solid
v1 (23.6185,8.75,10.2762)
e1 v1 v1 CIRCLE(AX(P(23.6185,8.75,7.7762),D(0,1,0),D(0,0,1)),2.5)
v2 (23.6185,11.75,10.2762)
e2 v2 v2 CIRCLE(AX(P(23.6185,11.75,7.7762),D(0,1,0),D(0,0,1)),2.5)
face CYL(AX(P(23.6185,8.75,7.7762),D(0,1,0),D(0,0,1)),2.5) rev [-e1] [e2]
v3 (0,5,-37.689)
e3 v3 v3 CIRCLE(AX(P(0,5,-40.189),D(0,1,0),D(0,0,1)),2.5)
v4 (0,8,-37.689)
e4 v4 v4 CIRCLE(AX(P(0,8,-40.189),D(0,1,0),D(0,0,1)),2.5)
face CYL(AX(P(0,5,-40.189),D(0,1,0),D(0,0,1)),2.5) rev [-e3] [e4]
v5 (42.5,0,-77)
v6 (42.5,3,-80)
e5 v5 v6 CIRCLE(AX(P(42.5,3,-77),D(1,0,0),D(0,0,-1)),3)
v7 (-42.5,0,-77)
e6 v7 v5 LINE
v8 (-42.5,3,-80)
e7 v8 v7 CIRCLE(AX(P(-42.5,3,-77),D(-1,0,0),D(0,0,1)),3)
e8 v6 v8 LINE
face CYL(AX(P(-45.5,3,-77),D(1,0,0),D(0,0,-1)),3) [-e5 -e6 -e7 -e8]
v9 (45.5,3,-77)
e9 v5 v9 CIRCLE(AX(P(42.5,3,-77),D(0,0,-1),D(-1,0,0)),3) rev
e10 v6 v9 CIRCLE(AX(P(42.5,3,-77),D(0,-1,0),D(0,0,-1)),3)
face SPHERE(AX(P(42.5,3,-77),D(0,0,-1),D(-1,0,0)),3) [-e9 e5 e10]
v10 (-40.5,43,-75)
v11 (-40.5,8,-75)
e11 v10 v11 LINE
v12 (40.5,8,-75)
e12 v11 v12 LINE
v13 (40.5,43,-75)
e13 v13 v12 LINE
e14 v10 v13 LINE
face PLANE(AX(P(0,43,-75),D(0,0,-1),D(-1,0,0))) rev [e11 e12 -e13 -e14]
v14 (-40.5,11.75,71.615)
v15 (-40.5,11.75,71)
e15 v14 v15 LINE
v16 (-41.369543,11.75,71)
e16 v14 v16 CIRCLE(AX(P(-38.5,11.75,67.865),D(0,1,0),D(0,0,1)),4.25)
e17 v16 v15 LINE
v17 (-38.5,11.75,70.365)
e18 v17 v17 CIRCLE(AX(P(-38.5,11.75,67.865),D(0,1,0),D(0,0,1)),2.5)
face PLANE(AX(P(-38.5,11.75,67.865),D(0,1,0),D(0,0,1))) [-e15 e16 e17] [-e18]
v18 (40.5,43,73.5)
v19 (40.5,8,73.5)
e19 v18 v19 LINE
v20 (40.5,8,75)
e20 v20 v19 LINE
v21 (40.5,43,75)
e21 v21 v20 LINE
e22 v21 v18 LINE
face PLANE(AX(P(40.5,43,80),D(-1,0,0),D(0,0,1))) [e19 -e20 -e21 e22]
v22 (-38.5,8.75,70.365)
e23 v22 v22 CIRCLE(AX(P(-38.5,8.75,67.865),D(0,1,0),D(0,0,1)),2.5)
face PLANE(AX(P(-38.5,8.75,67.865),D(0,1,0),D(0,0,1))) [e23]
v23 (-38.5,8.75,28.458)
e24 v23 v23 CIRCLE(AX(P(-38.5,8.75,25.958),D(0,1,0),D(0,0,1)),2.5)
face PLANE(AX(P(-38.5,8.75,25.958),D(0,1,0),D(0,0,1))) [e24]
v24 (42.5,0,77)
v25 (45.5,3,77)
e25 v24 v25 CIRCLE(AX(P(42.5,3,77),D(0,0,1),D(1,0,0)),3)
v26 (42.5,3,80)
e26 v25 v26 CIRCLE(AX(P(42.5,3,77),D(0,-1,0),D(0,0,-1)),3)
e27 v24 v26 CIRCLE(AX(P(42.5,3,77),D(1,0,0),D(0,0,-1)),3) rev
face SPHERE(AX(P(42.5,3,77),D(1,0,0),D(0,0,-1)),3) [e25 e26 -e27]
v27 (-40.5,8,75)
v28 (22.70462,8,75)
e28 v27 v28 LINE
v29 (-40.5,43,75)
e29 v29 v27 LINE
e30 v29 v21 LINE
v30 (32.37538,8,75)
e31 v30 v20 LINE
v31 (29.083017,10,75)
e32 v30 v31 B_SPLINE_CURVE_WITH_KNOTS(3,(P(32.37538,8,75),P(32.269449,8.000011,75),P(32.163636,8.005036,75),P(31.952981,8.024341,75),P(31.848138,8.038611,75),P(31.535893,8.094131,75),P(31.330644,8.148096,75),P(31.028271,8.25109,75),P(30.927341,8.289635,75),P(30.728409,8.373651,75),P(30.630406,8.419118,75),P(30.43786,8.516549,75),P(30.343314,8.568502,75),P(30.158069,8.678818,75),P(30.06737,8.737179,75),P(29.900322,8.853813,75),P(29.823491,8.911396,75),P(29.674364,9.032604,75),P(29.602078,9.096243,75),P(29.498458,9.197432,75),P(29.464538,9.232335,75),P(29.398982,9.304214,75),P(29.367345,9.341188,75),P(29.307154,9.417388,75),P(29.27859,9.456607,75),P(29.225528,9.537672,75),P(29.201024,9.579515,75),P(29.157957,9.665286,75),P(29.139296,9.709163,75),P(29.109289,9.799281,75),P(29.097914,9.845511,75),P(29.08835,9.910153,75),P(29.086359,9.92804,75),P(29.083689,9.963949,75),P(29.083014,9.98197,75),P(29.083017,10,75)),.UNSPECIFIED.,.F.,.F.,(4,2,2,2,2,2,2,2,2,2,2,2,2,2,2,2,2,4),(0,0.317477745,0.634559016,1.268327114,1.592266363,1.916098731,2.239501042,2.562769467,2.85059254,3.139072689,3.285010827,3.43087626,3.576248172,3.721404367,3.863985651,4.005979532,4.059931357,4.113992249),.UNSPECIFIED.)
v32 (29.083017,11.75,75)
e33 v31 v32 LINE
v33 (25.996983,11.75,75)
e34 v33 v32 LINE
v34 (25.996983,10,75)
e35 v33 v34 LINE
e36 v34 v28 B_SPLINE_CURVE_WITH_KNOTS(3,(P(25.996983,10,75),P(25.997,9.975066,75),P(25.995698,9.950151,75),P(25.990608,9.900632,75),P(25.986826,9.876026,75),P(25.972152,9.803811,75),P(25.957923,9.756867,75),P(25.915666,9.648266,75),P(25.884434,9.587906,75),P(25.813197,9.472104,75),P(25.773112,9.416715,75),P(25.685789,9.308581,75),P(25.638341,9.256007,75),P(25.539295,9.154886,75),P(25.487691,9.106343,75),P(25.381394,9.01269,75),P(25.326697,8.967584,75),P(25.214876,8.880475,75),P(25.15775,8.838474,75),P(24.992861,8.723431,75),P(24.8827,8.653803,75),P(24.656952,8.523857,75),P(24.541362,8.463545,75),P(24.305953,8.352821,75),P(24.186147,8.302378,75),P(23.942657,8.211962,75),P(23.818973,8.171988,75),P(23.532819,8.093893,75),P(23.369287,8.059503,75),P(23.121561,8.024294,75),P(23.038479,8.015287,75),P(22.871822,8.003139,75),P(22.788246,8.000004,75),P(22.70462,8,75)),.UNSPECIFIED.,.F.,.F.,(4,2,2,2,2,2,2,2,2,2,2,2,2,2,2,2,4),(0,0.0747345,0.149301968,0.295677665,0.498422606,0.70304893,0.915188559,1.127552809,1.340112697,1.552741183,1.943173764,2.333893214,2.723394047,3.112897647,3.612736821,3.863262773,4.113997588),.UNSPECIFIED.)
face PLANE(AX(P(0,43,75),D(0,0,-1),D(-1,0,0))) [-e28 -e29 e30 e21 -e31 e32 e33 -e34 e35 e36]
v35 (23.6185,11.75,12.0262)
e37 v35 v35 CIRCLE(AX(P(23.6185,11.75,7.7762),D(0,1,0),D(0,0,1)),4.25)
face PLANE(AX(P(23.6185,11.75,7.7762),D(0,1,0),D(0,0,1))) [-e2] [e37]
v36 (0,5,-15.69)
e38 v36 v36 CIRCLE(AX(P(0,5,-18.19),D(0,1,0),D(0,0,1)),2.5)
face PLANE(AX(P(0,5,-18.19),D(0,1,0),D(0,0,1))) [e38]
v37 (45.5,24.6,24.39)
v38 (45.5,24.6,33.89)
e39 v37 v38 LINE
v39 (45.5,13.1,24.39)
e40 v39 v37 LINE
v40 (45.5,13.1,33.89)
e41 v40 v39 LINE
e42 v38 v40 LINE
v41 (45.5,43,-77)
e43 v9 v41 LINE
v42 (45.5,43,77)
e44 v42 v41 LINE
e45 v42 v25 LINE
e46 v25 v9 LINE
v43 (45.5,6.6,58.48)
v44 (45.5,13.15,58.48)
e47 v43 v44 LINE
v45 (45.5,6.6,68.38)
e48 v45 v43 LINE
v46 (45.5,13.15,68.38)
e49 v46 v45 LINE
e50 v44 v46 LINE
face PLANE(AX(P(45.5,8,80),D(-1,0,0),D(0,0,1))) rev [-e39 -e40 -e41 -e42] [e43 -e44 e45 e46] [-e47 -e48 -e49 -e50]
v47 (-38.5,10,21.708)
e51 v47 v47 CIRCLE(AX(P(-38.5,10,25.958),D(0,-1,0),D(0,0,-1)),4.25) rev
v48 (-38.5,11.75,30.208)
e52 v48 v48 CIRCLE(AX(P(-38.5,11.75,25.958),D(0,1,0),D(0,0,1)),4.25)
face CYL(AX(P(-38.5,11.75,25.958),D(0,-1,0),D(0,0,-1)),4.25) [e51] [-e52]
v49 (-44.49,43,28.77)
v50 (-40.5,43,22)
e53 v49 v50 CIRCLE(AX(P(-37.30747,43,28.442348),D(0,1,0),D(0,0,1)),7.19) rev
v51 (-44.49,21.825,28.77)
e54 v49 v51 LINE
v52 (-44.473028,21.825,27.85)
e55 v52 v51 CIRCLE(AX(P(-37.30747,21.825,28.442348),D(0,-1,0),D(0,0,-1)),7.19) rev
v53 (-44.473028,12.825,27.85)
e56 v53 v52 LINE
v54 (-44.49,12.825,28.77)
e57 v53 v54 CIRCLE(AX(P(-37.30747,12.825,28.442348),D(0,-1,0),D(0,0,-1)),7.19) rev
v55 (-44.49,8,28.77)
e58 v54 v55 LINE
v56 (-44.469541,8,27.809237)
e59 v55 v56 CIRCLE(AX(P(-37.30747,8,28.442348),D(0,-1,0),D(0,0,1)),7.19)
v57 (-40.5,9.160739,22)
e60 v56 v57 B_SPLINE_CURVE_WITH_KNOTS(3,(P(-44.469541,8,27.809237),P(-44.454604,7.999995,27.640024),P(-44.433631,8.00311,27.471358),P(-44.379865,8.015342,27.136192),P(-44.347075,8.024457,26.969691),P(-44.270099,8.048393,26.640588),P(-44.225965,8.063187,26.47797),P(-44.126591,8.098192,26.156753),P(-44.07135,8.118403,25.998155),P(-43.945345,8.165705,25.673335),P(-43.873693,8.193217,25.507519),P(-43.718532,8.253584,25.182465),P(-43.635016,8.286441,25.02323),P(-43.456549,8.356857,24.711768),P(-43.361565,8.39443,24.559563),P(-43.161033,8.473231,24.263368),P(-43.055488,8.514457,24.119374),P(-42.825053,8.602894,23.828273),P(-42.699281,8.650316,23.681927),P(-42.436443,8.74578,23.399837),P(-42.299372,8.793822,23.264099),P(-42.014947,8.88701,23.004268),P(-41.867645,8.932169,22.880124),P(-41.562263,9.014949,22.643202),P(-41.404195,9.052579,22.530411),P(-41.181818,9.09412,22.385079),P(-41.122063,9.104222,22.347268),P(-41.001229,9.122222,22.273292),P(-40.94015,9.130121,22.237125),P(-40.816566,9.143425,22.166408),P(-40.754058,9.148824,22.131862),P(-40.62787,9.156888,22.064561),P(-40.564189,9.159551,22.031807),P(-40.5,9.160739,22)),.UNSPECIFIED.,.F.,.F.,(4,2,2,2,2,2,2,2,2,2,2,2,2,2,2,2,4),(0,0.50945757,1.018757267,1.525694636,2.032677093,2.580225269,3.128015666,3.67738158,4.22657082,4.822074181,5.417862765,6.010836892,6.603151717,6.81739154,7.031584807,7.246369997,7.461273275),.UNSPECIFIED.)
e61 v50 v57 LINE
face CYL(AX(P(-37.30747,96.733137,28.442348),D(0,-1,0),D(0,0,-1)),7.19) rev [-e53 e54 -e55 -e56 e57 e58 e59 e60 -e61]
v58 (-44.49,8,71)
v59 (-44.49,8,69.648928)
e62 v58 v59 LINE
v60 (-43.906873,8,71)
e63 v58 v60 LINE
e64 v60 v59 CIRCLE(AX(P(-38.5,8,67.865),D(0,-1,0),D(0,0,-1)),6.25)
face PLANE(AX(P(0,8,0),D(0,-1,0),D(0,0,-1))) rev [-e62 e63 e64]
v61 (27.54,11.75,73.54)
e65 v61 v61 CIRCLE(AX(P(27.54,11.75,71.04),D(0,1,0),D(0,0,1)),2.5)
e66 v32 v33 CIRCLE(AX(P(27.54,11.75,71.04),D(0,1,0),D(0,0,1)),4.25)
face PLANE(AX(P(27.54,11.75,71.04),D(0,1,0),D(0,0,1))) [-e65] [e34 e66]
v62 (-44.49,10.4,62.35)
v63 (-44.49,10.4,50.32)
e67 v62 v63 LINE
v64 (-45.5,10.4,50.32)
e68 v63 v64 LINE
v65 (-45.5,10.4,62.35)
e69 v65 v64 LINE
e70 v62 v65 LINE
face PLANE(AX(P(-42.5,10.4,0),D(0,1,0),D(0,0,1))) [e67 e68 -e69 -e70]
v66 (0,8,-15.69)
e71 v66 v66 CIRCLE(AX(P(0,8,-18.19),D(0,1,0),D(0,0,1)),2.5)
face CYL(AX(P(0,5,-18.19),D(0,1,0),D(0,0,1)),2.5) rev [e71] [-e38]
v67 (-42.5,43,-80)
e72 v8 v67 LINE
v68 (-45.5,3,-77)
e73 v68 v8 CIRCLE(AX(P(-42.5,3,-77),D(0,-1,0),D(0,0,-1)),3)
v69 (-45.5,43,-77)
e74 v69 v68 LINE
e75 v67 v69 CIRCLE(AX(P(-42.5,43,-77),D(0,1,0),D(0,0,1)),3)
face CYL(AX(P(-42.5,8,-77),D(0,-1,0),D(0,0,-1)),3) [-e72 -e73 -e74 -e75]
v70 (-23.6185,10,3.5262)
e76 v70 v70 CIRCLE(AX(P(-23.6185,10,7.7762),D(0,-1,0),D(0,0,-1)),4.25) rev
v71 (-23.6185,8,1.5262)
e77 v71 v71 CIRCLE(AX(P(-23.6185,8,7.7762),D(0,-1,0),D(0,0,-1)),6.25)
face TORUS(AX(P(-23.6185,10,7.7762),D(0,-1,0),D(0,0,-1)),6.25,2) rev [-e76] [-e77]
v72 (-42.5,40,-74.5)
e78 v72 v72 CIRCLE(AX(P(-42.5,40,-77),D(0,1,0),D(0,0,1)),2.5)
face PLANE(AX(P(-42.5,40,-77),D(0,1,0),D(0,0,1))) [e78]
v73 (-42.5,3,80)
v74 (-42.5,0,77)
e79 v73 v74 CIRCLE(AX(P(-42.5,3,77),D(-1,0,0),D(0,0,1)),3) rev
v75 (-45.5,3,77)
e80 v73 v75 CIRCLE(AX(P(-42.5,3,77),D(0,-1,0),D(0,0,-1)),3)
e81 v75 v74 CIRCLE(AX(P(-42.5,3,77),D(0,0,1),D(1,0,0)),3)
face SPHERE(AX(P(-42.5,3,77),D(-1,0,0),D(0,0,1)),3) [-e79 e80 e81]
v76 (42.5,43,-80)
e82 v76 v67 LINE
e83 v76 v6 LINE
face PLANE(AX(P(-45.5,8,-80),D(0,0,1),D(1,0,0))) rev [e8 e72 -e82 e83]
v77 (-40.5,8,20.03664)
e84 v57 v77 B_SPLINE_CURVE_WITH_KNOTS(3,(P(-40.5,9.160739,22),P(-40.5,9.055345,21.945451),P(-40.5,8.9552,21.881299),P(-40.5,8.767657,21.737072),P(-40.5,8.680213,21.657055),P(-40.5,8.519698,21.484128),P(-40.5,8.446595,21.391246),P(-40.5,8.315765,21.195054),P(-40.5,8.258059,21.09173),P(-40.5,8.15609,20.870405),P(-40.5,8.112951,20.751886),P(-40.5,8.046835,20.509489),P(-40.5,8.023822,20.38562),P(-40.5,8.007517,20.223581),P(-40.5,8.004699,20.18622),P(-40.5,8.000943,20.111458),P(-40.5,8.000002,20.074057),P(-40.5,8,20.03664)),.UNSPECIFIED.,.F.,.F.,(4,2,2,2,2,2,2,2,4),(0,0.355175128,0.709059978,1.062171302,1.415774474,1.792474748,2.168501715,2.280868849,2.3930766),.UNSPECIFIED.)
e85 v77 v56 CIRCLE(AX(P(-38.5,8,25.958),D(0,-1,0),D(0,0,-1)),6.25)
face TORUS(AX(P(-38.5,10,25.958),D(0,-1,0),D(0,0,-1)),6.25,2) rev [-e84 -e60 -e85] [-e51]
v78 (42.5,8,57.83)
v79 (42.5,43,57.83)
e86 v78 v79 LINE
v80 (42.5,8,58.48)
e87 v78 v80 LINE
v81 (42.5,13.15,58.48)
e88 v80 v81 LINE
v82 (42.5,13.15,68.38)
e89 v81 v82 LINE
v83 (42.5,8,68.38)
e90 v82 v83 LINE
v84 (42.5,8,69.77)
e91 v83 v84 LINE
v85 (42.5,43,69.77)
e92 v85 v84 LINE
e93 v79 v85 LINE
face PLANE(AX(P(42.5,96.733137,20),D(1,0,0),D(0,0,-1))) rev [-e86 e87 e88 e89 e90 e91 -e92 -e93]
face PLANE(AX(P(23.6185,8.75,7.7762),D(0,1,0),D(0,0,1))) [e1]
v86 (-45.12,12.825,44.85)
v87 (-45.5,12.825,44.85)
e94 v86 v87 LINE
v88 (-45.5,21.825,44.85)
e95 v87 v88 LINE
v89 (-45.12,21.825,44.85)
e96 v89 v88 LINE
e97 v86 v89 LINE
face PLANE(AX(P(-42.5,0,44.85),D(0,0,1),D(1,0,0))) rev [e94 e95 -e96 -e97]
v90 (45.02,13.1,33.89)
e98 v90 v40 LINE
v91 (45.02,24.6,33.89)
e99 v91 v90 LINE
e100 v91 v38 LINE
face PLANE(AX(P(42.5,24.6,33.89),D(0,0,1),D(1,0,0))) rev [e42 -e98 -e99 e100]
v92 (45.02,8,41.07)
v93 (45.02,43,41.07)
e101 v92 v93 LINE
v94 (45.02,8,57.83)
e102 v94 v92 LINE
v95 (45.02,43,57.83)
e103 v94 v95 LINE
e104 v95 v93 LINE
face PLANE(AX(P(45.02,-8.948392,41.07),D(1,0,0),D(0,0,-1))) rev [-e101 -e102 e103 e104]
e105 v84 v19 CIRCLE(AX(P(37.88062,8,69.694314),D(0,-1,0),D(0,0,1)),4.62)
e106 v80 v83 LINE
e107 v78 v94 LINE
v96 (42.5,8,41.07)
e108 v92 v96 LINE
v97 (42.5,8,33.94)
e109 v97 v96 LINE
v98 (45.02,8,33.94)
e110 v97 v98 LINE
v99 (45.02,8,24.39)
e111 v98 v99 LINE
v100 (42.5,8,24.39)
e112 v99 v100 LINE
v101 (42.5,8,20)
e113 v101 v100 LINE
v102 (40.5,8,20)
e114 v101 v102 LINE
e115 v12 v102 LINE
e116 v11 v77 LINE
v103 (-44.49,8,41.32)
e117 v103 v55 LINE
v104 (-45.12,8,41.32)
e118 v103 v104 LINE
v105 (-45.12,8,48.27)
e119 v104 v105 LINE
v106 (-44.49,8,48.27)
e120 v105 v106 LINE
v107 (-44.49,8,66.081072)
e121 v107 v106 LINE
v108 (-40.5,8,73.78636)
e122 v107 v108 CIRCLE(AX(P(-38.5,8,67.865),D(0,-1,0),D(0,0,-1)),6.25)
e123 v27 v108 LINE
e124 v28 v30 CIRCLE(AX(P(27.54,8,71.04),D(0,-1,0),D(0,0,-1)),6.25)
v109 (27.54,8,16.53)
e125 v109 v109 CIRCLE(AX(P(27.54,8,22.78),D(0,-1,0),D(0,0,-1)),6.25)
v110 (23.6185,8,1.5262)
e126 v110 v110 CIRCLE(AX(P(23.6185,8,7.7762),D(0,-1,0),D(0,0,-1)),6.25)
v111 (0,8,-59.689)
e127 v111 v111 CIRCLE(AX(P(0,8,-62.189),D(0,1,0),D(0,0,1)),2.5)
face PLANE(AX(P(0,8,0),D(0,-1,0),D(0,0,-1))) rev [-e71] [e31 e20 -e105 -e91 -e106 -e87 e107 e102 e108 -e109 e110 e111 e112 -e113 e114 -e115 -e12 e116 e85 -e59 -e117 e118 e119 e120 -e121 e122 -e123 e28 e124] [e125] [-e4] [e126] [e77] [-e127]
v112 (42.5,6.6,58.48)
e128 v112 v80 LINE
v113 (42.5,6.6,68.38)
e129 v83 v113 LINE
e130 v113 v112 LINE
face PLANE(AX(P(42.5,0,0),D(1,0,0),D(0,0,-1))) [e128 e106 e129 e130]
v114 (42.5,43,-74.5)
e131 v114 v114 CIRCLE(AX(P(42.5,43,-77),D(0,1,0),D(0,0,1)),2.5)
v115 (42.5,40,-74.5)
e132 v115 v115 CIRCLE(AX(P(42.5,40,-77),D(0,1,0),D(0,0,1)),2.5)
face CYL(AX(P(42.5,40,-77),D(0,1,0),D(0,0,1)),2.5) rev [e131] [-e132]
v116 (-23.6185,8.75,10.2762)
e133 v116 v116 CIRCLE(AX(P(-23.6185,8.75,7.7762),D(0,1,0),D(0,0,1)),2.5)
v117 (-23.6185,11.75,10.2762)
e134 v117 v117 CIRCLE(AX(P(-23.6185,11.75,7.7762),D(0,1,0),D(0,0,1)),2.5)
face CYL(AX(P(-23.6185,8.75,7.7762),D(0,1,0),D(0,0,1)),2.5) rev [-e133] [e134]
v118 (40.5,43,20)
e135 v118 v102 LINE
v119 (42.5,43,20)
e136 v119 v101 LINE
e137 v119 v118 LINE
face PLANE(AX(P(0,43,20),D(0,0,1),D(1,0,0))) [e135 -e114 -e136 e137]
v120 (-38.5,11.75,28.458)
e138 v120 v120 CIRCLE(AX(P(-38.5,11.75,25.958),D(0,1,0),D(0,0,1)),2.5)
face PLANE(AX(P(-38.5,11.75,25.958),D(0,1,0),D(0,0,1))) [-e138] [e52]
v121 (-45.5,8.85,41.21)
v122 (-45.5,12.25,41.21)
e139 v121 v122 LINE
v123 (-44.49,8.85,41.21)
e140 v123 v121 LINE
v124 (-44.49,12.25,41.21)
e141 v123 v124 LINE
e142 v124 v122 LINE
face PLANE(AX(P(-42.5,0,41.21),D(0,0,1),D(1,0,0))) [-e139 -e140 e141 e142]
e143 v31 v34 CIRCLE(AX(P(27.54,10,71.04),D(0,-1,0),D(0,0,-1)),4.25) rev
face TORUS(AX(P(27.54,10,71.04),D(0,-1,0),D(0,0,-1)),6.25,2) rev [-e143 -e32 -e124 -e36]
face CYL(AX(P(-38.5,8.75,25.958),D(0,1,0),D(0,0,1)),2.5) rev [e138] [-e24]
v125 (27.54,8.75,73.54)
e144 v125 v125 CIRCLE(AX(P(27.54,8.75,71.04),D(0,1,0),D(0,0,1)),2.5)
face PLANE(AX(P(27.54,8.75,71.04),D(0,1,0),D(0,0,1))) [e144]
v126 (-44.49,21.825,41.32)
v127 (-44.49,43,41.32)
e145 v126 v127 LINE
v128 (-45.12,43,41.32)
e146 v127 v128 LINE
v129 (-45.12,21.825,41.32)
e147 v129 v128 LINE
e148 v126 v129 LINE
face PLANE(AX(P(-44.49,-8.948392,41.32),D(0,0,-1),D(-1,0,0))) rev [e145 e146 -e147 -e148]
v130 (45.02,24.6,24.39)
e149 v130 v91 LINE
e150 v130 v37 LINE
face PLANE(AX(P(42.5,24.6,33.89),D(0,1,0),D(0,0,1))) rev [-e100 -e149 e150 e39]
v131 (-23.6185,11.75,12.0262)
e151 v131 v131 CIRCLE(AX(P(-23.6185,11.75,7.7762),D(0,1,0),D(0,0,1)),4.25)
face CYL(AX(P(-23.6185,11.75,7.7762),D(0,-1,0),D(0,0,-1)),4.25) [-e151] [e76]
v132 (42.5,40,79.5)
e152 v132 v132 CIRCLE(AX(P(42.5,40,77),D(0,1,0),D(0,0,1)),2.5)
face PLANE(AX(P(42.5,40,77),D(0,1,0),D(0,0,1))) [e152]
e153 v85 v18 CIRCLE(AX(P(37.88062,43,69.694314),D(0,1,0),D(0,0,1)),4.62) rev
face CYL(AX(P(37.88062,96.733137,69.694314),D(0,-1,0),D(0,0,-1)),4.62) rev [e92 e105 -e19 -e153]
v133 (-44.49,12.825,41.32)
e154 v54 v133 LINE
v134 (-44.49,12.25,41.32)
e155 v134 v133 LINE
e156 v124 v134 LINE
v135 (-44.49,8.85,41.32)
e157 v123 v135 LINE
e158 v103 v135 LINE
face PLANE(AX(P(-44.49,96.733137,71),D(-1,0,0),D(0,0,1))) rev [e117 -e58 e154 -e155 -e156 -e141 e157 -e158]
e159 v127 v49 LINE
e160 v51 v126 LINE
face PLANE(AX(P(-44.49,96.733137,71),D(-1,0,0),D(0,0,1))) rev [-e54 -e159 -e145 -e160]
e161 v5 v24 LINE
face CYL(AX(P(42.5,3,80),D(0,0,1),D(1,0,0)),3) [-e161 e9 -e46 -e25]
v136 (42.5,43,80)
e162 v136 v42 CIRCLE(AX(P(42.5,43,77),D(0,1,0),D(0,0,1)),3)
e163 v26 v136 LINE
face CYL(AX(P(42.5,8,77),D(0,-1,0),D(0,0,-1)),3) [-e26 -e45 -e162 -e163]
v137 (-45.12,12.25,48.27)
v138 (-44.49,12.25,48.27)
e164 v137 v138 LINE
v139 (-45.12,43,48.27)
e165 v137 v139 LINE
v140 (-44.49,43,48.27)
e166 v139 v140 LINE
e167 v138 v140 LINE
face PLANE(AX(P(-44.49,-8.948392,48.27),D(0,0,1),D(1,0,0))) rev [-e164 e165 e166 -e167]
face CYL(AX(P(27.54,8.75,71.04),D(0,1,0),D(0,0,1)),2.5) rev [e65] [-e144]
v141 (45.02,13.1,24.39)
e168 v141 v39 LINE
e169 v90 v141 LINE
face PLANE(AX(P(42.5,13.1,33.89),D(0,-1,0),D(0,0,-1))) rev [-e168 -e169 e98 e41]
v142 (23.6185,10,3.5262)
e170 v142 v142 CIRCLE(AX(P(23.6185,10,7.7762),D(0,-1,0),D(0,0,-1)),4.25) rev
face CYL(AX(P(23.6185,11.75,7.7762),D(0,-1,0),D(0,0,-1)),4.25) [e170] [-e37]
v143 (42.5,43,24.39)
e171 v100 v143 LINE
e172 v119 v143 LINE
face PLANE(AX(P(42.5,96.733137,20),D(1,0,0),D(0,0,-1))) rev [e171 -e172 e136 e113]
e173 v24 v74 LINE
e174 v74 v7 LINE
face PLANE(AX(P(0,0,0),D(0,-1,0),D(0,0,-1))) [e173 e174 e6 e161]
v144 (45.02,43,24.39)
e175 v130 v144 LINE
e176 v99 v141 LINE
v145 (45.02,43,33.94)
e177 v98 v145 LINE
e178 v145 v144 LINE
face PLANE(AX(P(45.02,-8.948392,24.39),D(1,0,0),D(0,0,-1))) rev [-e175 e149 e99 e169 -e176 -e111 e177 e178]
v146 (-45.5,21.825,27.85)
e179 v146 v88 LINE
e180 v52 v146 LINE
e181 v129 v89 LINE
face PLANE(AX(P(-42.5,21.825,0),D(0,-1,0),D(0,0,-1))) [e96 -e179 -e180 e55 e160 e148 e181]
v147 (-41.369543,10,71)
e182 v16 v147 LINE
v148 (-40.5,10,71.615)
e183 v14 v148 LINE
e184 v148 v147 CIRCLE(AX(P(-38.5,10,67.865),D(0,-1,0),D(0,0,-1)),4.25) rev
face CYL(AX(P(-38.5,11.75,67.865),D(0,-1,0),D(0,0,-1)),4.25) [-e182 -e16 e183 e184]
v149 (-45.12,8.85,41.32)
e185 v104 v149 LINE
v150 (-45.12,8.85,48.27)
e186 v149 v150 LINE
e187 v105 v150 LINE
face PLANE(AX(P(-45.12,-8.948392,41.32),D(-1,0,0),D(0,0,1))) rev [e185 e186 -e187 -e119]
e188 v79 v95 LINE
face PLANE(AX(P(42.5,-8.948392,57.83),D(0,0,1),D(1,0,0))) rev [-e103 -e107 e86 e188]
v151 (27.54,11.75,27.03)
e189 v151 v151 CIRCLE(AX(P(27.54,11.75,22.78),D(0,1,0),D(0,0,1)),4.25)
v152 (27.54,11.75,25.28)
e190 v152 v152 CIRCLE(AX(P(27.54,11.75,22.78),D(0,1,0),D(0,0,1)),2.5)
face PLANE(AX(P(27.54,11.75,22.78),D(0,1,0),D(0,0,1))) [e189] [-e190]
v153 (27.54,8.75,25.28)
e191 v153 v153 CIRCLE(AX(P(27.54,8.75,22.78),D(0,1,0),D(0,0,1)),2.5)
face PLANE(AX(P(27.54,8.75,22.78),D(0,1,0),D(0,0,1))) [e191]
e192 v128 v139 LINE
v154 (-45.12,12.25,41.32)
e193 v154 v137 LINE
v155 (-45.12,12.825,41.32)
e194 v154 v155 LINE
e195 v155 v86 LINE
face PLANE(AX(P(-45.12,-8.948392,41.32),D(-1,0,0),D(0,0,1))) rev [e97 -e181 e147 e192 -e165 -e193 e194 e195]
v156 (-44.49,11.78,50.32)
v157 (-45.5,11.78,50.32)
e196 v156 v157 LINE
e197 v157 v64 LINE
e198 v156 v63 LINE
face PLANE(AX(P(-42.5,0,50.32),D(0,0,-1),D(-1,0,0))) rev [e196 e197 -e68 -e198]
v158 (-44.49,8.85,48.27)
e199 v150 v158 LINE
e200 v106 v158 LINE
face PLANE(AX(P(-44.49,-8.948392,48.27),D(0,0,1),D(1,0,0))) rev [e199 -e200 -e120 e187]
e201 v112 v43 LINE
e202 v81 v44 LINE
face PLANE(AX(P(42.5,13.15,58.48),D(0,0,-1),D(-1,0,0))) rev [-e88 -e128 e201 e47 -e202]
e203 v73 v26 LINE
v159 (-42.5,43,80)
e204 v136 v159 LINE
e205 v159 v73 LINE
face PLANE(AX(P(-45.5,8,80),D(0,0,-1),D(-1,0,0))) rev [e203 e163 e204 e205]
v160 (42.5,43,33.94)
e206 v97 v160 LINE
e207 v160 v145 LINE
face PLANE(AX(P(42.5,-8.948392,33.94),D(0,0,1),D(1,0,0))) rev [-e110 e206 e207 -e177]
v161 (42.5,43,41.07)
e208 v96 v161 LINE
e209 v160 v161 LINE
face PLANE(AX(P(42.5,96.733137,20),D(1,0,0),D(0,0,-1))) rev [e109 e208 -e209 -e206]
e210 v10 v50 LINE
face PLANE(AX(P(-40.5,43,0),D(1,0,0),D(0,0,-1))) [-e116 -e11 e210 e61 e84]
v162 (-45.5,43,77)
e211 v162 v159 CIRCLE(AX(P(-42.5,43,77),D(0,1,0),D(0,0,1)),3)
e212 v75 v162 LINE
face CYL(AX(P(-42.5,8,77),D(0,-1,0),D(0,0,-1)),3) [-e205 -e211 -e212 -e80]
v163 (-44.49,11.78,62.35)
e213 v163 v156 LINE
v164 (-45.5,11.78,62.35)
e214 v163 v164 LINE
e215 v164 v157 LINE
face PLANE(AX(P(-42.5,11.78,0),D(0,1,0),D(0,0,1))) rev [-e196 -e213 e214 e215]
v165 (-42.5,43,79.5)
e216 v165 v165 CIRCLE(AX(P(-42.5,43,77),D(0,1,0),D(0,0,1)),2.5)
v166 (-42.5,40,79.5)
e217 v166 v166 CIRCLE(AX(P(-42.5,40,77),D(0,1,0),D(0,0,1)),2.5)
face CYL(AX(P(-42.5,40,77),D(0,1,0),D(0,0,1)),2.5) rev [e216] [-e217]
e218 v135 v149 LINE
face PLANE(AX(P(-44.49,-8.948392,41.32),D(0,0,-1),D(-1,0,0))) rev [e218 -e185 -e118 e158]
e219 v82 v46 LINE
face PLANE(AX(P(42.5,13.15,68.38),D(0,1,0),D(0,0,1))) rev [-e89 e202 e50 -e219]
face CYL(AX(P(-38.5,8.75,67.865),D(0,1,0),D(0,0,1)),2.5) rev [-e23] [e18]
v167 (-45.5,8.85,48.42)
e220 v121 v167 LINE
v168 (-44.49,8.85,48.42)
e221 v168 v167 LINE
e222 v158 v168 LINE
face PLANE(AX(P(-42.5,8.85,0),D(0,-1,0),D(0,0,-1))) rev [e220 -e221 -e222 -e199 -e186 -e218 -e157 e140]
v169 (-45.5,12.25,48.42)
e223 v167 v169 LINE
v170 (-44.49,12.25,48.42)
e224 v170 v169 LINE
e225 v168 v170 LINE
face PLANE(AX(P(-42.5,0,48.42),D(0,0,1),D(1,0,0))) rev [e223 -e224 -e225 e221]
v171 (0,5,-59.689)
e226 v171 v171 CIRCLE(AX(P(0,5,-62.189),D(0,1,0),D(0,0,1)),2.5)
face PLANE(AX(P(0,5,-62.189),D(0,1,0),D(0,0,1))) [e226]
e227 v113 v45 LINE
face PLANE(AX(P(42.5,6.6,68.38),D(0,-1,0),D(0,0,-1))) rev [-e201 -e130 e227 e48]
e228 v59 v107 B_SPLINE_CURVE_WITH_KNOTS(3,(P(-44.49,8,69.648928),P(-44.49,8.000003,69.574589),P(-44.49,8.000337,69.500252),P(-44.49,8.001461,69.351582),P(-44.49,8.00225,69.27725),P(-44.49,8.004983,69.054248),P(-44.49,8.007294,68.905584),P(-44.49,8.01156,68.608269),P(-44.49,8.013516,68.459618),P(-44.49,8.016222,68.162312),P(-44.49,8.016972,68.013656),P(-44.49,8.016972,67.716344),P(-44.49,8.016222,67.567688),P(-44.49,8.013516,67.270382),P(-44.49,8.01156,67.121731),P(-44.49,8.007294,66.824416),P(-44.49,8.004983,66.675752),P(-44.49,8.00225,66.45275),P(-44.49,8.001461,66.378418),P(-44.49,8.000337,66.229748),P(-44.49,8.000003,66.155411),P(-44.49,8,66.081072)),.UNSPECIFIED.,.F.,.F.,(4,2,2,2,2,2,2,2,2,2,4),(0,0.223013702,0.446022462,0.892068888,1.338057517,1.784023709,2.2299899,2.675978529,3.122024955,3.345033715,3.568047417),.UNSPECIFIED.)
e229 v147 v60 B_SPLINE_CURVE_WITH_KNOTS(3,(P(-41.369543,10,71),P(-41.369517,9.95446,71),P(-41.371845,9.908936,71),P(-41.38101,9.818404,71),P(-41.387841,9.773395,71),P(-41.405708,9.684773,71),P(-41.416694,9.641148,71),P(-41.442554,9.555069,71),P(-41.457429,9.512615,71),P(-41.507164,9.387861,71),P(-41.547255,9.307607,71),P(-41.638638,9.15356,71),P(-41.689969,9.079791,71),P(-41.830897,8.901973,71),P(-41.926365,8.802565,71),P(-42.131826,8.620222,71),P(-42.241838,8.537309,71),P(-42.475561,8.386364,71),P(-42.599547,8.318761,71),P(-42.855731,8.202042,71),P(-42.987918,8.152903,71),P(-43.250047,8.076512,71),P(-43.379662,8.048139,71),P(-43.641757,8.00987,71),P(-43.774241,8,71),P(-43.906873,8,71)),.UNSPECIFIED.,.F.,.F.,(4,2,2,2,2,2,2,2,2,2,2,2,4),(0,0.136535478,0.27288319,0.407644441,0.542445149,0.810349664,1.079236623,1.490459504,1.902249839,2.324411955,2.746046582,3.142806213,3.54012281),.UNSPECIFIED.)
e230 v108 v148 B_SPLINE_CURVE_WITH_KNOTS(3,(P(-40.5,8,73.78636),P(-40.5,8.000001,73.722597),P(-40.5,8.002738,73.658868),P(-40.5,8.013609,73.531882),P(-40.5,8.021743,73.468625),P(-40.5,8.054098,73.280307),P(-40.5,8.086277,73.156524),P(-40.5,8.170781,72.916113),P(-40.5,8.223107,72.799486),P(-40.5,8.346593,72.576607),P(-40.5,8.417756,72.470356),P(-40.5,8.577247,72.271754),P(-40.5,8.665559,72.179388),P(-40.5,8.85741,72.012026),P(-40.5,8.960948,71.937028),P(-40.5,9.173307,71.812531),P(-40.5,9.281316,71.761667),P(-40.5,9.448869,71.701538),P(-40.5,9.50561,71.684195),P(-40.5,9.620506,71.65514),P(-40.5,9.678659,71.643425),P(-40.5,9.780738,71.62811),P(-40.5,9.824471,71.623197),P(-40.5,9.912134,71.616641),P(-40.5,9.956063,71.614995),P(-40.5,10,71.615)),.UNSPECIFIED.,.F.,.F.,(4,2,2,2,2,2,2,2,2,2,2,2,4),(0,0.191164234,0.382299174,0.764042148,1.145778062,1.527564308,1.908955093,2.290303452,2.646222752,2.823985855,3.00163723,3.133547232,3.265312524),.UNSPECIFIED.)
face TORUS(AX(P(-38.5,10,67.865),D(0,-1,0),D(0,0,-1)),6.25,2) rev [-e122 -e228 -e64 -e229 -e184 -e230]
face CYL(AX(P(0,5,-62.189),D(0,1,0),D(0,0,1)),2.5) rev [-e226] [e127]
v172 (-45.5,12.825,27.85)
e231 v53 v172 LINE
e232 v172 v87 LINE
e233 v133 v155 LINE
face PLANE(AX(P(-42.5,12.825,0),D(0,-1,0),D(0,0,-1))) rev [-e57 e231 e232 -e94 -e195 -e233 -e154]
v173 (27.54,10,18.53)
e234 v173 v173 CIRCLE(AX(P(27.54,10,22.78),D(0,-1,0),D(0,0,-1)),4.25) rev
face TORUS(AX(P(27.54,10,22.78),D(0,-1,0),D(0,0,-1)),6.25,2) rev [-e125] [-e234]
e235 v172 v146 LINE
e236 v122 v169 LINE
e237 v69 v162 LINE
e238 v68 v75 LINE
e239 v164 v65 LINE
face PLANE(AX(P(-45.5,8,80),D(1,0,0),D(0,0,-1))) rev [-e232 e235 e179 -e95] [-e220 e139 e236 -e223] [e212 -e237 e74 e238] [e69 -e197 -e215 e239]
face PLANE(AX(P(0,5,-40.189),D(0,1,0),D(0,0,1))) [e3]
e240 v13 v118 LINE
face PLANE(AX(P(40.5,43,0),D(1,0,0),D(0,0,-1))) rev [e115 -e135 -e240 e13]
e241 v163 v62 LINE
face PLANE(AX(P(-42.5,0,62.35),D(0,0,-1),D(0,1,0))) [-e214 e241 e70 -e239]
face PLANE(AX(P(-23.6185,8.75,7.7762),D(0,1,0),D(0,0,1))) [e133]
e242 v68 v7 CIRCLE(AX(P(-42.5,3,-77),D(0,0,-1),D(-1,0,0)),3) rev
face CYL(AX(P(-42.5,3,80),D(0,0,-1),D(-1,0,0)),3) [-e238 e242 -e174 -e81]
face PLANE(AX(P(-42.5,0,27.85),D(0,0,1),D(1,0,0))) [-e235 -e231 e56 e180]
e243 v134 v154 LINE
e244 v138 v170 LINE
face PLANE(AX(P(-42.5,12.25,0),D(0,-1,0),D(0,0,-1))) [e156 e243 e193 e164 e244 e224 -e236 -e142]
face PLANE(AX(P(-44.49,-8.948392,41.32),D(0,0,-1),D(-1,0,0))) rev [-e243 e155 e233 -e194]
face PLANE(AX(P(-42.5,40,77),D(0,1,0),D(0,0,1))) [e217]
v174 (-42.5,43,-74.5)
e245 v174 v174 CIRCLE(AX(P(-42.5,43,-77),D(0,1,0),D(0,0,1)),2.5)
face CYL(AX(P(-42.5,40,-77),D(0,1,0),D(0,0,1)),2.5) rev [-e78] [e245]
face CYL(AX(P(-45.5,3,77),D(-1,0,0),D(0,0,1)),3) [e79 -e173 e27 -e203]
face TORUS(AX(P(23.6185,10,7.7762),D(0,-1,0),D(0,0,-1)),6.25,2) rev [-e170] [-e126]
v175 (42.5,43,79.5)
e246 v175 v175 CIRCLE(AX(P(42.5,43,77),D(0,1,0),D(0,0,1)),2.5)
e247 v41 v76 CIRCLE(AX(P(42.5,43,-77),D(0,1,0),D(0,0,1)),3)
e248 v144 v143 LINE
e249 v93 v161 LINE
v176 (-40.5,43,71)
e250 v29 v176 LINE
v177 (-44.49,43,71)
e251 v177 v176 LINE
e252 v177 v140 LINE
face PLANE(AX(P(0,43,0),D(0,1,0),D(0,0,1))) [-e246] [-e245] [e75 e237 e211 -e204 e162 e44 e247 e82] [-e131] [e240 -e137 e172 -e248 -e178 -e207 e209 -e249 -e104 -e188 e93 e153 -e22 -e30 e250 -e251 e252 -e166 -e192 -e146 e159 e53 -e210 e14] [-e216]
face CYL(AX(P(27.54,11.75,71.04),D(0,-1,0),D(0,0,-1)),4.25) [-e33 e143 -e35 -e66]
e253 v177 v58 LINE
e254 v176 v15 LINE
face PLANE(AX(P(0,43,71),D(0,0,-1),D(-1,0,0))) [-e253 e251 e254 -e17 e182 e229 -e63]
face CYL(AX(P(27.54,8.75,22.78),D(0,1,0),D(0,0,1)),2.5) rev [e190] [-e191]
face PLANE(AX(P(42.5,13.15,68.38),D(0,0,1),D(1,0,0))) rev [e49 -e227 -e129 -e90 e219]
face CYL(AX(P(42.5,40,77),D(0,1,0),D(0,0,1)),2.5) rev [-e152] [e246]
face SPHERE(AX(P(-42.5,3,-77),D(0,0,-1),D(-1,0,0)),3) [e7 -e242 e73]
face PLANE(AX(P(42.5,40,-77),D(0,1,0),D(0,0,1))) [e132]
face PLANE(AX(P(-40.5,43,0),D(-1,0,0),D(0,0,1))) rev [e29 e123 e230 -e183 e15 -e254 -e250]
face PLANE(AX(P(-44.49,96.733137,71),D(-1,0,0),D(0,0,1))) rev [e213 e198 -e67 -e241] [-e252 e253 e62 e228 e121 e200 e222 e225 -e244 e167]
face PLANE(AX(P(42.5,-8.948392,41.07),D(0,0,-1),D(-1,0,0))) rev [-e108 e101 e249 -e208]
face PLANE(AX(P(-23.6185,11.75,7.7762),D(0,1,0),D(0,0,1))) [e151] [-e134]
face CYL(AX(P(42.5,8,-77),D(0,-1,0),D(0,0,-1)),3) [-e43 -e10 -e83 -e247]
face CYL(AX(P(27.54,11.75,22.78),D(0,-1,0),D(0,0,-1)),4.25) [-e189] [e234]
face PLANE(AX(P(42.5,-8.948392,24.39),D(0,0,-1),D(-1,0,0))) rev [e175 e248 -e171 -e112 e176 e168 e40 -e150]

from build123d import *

# Parameters (mm, degrees)
SKETCH1_W           = 91
SKETCH1_H           = 160
BOSS_EXTRUDE1_DEPTH = 8
BOSS_EXTRUDE4_DEPTH = 35
SKETCH5_R           = 4.25
BOSS_EXTRUDE5_DEPTH = 3.75
BOSS_EXTRUDE6_DEPTH = 35
SKETCH7_W           = 2.52
SKETCH7_H           = 9.55
SKETCH7_H_2         = 16.76
SKETCH7_W_2         = 0.63
SKETCH7_H_3         = 6.95
CUT_EXTRUDE1_DEPTH  = 35
SKETCH8_R           = 2.5
CUT_EXTRUDE2_DEPTH  = 3
SKETCH9_R           = 2.5
CUT_EXTRUDE3_DEPTH  = 3
FILLET2_R           = 2
SKETCH10_W          = 9.9
SKETCH10_H          = 6.55
SKETCH10_W_2        = 9.5
SKETCH10_H_2        = 11.5
CUT_EXTRUDE4_DEPTH  = 3
SKETCH11_W          = 12.03
SKETCH11_H          = 1.38
SKETCH11_W_2        = 7.21
SKETCH11_H_2        = 3.4
SKETCH11_W_3        = 17
SKETCH11_H_3        = 9
CUT_EXTRUDE5_DEPTH  = 3
SKETCH12_R          = 2.5
CUT_EXTRUDE6_DEPTH  = 3
FILLET3_R           = 3


with BuildPart() as part:
    # Sketch1 → Boss-Extrude1 (new body)
    with BuildSketch(Plane(origin=(0, 0, 0), x_dir=(1, 0, 0), z_dir=(0, 1, 0))):
        Rectangle(SKETCH1_W, SKETCH1_H)
    extrude(amount=BOSS_EXTRUDE1_DEPTH)

    # Sketch4 → Boss-Extrude4 (add)
    with BuildSketch(Plane(origin=(0, 8, 0), x_dir=(1, 0, 0), z_dir=(0, 1, 0))):
        Polygon((-45.5, 80), (-45.5, -22), (-40.5, -22), (-40.5, 75), (40.5, 75), (40.5, -20), (45.5, -20), (45.5, 80), align=None)
        Polygon((-45.5, -80), (45.5, -80), (45.5, -73.5), (40.5, -73.5), (40.5, -75), (-40.5, -75), (-40.5, -71), (-45.5, -71), align=None)
    extrude(amount=BOSS_EXTRUDE4_DEPTH)

    # Sketch5 → Boss-Extrude5 (add)
    with BuildSketch(Plane(origin=(0, 8, 0), x_dir=(1, 0, 0), z_dir=(0, 1, 0))):
        with Locations(Location((23.6185, -7.7762, 0), (0, 0, 90))):
            Circle(SKETCH5_R)
        with Locations(Location((-23.6185, -7.7762, 0), (0, 0, 90))):
            Circle(SKETCH5_R)
        with Locations(Location((27.54, -22.78, 0), (0, 0, 90))):
            Circle(SKETCH5_R)
        with Locations((27.54, -71.04)):
            Circle(SKETCH5_R)
        with Locations((-38.5, -67.865)):
            Circle(SKETCH5_R)
        with Locations(Location((-38.5, -25.958, 0), (0, 0, 90))):
            Circle(SKETCH5_R)
    extrude(amount=BOSS_EXTRUDE5_DEPTH)

    # Sketch6 → Boss-Extrude6 (add)
    with BuildSketch(Plane(origin=(0, 8, 0), x_dir=(1, 0, 0), z_dir=(0, 1, 0))):
        with BuildLine():
            Line((-45.5, -22), (-45.5, -71))
            Line((-45.5, -71), (-44.49, -71))
            Line((-44.49, -71), (-44.49, -28.77))
            ThreePointArc((-44.49, -28.77), (-43.501716646, -24.7916766), (-40.5, -22))
            Line((-40.5, -22), (-45.5, -22))
        make_face()
        with BuildLine():
            Line((45.5, -73.5), (45.5, -20))
            Line((45.5, -20), (42.5, -20))
            Line((42.5, -20), (42.5, -69.77))
            ThreePointArc((42.5, -69.77), (41.952245791, -71.877491041), (40.5, -73.5))
            Line((40.5, -73.5), (45.5, -73.5))
        make_face()
    extrude(amount=BOSS_EXTRUDE6_DEPTH)

    # Sketch7 → Cut-Extrude1 (cut)
    with BuildSketch(Plane(origin=(0, 43, 0), x_dir=(1, 0, 0), z_dir=(0, 1, 0))):
        with Locations((43.76, -29.165)):
            Rectangle(SKETCH7_W, SKETCH7_H)
        with Locations((43.76, -49.45)):
            Rectangle(SKETCH7_W, SKETCH7_H_2)
        with Locations((-44.805, -44.795)):
            Rectangle(SKETCH7_W_2, SKETCH7_H_3)
    extrude(amount=-CUT_EXTRUDE1_DEPTH, mode=Mode.SUBTRACT)

    # Sketch8 → Cut-Extrude2 (cut)
    with BuildSketch(Plane(origin=(0, 8, 0), x_dir=(1, 0, 0), z_dir=(0, 1, 0))):
        with Locations(Location((0, 62.189, 0), (0, 0, 270))):
            Circle(SKETCH8_R)
        with Locations(Location((0, 40.189, 0), (0, 0, 270))):
            Circle(SKETCH8_R)
        with Locations(Location((0, 18.19, 0), (0, 0, 270))):
            Circle(SKETCH8_R)
    extrude(amount=-CUT_EXTRUDE2_DEPTH, mode=Mode.SUBTRACT)

    # Sketch9 → Cut-Extrude3 (cut)
    with BuildSketch(Plane(origin=(0, 11.75, 0), x_dir=(1, 0, 0), z_dir=(0, 1, 0))):
        with Locations(Location((-23.6185, -7.7762, 0), (0, 0, 270))):
            Circle(SKETCH9_R)
        with Locations(Location((23.6185, -7.7762, 0), (0, 0, 270))):
            Circle(SKETCH9_R)
        with Locations(Location((27.54, -22.78, 0), (0, 0, 270))):
            Circle(SKETCH9_R)
        with Locations(Location((-38.5, -25.958, 0), (0, 0, 270))):
            Circle(SKETCH9_R)
        with Locations(Location((-38.5, -67.865, 0), (0, 0, 270))):
            Circle(SKETCH9_R)
        with Locations(Location((27.54, -71.04, 0), (0, 0, 270))):
            Circle(SKETCH9_R)
    extrude(amount=-CUT_EXTRUDE3_DEPTH, mode=Mode.SUBTRACT)

    # Fillet2
    # the kernel refuses this fillet: 2 mm, written as the material it adds along each edge
    with BuildSketch(Plane(origin=(23.6185, 8, 7.7762), x_dir=(0, 0, -1), z_dir=(1, 0, 0))) as fillet2_piece_1:
        with BuildLine():
            CenterArc((4.25 + FILLET2_R, FILLET2_R), FILLET2_R, 180, 90)
            Line((4.25, FILLET2_R), (4.25, 0))
            Line((4.25, 0), (4.25 + FILLET2_R, 0))
        make_face()
    revolve(axis=Axis((23.6185, 8, 7.7762), (0, 1, 0)))
    with BuildSketch(Plane(origin=(-23.6185, 8, 7.7762), x_dir=(0, 0, -1), z_dir=(1, 0, 0))) as fillet2_piece_2:
        with BuildLine():
            CenterArc((4.25 + FILLET2_R, FILLET2_R), FILLET2_R, 180, 90)
            Line((4.25, FILLET2_R), (4.25, 0))
            Line((4.25, 0), (4.25 + FILLET2_R, 0))
        make_face()
    revolve(axis=Axis((-23.6185, 8, 7.7762), (0, 1, 0)))
    with BuildSketch(Plane(origin=(27.54, 8, 22.78), x_dir=(0, 0, -1), z_dir=(1, 0, 0))) as fillet2_piece_3:
        with BuildLine():
            CenterArc((4.25 + FILLET2_R, FILLET2_R), FILLET2_R, 180, 90)
            Line((4.25, FILLET2_R), (4.25, 0))
            Line((4.25, 0), (4.25 + FILLET2_R, 0))
        make_face()
    revolve(axis=Axis((27.54, 8, 22.78), (0, 1, 0)))
    with BuildSketch(Plane(origin=(27.54, 8, 71.04), x_dir=(-0.003141587485864213, 0, 0.9999950652018583), z_dir=(0.9999950652018583, 0, 0.003141587485864213))) as fillet2_piece_4:
        with BuildLine():
            CenterArc((4.25 + FILLET2_R, -FILLET2_R), FILLET2_R, 90, 90)
            Line((4.25, -FILLET2_R), (4.25, 0))
            Line((4.25, 0), (4.25 + FILLET2_R, 0))
        make_face()
    revolve(axis=Axis((27.54, 8, 71.04), (0, -1, 0)), revolution_arc=359.64)
    with BuildSketch(Plane(origin=(-38.5, 8, 67.865), x_dir=(-0.5800002610708566, 0, 0.81461628829636), z_dir=(0.81461628829636, 0, 0.5800002610708566))) as fillet2_piece_5:
        with BuildLine():
            CenterArc((4.25 + FILLET2_R, -FILLET2_R), FILLET2_R, 90, 90)
            Line((4.25, -FILLET2_R), (4.25, 0))
            Line((4.25, 0), (4.25 + FILLET2_R, 0))
        make_face()
    revolve(axis=Axis((-38.5, 8, 67.865), (0, -1, 0)), revolution_arc=359.64)
    with BuildSketch(Plane(origin=(-38.5, 8, 25.958), x_dir=(0, 0, -1), z_dir=(1, 0, 0))) as fillet2_piece_6:
        with BuildLine():
            CenterArc((4.25 + FILLET2_R, FILLET2_R), FILLET2_R, 180, 90)
            Line((4.25, FILLET2_R), (4.25, 0))
            Line((4.25, 0), (4.25 + FILLET2_R, 0))
        make_face()
    revolve(axis=Axis((-38.5, 8, 25.958), (0, 1, 0)))

    # Sketch10 → Cut-Extrude4 (cut)
    with BuildSketch(Plane(origin=(45.5, 0, 0), x_dir=(0, 0, -1), z_dir=(1, 0, 0))):
        with Locations((-63.43, 9.875)):
            Rectangle(SKETCH10_W, SKETCH10_H)
        with Locations((-29.14, 18.85)):
            Rectangle(SKETCH10_W_2, SKETCH10_H_2)
    extrude(amount=-CUT_EXTRUDE4_DEPTH, mode=Mode.SUBTRACT)

    # Sketch11 → Cut-Extrude5 (cut)
    with BuildSketch(Plane.ZY.offset(45.5)):
        with Locations((56.335, 11.09)):
            Rectangle(SKETCH11_W, SKETCH11_H)
        with Locations((44.815, 10.55)):
            Rectangle(SKETCH11_W_2, SKETCH11_H_2)
        with Locations((36.35, 17.325)):
            Rectangle(SKETCH11_W_3, SKETCH11_H_3)
    extrude(amount=-CUT_EXTRUDE5_DEPTH, mode=Mode.SUBTRACT)

    # Sketch12 → Cut-Extrude6 (cut)
    with BuildSketch(Plane(origin=(0, 43, 0), x_dir=(1, 0, 0), z_dir=(0, 1, 0))):
        with Locations(Location((-42.5, 77, 0), (0, 0, 270))):
            Circle(SKETCH12_R)
        with Locations(Location((42.5, 77, 0), (0, 0, 270))):
            Circle(SKETCH12_R)
        with Locations(Location((-42.5, -77, 0), (0, 0, 270))):
            Circle(SKETCH12_R)
        with Locations(Location((42.5, -77, 0), (0, 0, 270))):
            Circle(SKETCH12_R)
    extrude(amount=-CUT_EXTRUDE6_DEPTH, mode=Mode.SUBTRACT)

    # Fillet3
    fillet3_edges = [part.edges().sort_by_distance(p)[0] for p in [
        (0, 0, 80),
        (-45.5, 0, 0),
        (0, 0, -80),
        (45.5, 0, 0),
        (45.5, 21.5, 80),
        (-45.5, 21.5, 80),
        (-45.5, 21.5, -80),
        (45.5, 21.5, -80),
    ]]
    fillet(fillet3_edges, radius=FILLET3_R)


solid = part.part
